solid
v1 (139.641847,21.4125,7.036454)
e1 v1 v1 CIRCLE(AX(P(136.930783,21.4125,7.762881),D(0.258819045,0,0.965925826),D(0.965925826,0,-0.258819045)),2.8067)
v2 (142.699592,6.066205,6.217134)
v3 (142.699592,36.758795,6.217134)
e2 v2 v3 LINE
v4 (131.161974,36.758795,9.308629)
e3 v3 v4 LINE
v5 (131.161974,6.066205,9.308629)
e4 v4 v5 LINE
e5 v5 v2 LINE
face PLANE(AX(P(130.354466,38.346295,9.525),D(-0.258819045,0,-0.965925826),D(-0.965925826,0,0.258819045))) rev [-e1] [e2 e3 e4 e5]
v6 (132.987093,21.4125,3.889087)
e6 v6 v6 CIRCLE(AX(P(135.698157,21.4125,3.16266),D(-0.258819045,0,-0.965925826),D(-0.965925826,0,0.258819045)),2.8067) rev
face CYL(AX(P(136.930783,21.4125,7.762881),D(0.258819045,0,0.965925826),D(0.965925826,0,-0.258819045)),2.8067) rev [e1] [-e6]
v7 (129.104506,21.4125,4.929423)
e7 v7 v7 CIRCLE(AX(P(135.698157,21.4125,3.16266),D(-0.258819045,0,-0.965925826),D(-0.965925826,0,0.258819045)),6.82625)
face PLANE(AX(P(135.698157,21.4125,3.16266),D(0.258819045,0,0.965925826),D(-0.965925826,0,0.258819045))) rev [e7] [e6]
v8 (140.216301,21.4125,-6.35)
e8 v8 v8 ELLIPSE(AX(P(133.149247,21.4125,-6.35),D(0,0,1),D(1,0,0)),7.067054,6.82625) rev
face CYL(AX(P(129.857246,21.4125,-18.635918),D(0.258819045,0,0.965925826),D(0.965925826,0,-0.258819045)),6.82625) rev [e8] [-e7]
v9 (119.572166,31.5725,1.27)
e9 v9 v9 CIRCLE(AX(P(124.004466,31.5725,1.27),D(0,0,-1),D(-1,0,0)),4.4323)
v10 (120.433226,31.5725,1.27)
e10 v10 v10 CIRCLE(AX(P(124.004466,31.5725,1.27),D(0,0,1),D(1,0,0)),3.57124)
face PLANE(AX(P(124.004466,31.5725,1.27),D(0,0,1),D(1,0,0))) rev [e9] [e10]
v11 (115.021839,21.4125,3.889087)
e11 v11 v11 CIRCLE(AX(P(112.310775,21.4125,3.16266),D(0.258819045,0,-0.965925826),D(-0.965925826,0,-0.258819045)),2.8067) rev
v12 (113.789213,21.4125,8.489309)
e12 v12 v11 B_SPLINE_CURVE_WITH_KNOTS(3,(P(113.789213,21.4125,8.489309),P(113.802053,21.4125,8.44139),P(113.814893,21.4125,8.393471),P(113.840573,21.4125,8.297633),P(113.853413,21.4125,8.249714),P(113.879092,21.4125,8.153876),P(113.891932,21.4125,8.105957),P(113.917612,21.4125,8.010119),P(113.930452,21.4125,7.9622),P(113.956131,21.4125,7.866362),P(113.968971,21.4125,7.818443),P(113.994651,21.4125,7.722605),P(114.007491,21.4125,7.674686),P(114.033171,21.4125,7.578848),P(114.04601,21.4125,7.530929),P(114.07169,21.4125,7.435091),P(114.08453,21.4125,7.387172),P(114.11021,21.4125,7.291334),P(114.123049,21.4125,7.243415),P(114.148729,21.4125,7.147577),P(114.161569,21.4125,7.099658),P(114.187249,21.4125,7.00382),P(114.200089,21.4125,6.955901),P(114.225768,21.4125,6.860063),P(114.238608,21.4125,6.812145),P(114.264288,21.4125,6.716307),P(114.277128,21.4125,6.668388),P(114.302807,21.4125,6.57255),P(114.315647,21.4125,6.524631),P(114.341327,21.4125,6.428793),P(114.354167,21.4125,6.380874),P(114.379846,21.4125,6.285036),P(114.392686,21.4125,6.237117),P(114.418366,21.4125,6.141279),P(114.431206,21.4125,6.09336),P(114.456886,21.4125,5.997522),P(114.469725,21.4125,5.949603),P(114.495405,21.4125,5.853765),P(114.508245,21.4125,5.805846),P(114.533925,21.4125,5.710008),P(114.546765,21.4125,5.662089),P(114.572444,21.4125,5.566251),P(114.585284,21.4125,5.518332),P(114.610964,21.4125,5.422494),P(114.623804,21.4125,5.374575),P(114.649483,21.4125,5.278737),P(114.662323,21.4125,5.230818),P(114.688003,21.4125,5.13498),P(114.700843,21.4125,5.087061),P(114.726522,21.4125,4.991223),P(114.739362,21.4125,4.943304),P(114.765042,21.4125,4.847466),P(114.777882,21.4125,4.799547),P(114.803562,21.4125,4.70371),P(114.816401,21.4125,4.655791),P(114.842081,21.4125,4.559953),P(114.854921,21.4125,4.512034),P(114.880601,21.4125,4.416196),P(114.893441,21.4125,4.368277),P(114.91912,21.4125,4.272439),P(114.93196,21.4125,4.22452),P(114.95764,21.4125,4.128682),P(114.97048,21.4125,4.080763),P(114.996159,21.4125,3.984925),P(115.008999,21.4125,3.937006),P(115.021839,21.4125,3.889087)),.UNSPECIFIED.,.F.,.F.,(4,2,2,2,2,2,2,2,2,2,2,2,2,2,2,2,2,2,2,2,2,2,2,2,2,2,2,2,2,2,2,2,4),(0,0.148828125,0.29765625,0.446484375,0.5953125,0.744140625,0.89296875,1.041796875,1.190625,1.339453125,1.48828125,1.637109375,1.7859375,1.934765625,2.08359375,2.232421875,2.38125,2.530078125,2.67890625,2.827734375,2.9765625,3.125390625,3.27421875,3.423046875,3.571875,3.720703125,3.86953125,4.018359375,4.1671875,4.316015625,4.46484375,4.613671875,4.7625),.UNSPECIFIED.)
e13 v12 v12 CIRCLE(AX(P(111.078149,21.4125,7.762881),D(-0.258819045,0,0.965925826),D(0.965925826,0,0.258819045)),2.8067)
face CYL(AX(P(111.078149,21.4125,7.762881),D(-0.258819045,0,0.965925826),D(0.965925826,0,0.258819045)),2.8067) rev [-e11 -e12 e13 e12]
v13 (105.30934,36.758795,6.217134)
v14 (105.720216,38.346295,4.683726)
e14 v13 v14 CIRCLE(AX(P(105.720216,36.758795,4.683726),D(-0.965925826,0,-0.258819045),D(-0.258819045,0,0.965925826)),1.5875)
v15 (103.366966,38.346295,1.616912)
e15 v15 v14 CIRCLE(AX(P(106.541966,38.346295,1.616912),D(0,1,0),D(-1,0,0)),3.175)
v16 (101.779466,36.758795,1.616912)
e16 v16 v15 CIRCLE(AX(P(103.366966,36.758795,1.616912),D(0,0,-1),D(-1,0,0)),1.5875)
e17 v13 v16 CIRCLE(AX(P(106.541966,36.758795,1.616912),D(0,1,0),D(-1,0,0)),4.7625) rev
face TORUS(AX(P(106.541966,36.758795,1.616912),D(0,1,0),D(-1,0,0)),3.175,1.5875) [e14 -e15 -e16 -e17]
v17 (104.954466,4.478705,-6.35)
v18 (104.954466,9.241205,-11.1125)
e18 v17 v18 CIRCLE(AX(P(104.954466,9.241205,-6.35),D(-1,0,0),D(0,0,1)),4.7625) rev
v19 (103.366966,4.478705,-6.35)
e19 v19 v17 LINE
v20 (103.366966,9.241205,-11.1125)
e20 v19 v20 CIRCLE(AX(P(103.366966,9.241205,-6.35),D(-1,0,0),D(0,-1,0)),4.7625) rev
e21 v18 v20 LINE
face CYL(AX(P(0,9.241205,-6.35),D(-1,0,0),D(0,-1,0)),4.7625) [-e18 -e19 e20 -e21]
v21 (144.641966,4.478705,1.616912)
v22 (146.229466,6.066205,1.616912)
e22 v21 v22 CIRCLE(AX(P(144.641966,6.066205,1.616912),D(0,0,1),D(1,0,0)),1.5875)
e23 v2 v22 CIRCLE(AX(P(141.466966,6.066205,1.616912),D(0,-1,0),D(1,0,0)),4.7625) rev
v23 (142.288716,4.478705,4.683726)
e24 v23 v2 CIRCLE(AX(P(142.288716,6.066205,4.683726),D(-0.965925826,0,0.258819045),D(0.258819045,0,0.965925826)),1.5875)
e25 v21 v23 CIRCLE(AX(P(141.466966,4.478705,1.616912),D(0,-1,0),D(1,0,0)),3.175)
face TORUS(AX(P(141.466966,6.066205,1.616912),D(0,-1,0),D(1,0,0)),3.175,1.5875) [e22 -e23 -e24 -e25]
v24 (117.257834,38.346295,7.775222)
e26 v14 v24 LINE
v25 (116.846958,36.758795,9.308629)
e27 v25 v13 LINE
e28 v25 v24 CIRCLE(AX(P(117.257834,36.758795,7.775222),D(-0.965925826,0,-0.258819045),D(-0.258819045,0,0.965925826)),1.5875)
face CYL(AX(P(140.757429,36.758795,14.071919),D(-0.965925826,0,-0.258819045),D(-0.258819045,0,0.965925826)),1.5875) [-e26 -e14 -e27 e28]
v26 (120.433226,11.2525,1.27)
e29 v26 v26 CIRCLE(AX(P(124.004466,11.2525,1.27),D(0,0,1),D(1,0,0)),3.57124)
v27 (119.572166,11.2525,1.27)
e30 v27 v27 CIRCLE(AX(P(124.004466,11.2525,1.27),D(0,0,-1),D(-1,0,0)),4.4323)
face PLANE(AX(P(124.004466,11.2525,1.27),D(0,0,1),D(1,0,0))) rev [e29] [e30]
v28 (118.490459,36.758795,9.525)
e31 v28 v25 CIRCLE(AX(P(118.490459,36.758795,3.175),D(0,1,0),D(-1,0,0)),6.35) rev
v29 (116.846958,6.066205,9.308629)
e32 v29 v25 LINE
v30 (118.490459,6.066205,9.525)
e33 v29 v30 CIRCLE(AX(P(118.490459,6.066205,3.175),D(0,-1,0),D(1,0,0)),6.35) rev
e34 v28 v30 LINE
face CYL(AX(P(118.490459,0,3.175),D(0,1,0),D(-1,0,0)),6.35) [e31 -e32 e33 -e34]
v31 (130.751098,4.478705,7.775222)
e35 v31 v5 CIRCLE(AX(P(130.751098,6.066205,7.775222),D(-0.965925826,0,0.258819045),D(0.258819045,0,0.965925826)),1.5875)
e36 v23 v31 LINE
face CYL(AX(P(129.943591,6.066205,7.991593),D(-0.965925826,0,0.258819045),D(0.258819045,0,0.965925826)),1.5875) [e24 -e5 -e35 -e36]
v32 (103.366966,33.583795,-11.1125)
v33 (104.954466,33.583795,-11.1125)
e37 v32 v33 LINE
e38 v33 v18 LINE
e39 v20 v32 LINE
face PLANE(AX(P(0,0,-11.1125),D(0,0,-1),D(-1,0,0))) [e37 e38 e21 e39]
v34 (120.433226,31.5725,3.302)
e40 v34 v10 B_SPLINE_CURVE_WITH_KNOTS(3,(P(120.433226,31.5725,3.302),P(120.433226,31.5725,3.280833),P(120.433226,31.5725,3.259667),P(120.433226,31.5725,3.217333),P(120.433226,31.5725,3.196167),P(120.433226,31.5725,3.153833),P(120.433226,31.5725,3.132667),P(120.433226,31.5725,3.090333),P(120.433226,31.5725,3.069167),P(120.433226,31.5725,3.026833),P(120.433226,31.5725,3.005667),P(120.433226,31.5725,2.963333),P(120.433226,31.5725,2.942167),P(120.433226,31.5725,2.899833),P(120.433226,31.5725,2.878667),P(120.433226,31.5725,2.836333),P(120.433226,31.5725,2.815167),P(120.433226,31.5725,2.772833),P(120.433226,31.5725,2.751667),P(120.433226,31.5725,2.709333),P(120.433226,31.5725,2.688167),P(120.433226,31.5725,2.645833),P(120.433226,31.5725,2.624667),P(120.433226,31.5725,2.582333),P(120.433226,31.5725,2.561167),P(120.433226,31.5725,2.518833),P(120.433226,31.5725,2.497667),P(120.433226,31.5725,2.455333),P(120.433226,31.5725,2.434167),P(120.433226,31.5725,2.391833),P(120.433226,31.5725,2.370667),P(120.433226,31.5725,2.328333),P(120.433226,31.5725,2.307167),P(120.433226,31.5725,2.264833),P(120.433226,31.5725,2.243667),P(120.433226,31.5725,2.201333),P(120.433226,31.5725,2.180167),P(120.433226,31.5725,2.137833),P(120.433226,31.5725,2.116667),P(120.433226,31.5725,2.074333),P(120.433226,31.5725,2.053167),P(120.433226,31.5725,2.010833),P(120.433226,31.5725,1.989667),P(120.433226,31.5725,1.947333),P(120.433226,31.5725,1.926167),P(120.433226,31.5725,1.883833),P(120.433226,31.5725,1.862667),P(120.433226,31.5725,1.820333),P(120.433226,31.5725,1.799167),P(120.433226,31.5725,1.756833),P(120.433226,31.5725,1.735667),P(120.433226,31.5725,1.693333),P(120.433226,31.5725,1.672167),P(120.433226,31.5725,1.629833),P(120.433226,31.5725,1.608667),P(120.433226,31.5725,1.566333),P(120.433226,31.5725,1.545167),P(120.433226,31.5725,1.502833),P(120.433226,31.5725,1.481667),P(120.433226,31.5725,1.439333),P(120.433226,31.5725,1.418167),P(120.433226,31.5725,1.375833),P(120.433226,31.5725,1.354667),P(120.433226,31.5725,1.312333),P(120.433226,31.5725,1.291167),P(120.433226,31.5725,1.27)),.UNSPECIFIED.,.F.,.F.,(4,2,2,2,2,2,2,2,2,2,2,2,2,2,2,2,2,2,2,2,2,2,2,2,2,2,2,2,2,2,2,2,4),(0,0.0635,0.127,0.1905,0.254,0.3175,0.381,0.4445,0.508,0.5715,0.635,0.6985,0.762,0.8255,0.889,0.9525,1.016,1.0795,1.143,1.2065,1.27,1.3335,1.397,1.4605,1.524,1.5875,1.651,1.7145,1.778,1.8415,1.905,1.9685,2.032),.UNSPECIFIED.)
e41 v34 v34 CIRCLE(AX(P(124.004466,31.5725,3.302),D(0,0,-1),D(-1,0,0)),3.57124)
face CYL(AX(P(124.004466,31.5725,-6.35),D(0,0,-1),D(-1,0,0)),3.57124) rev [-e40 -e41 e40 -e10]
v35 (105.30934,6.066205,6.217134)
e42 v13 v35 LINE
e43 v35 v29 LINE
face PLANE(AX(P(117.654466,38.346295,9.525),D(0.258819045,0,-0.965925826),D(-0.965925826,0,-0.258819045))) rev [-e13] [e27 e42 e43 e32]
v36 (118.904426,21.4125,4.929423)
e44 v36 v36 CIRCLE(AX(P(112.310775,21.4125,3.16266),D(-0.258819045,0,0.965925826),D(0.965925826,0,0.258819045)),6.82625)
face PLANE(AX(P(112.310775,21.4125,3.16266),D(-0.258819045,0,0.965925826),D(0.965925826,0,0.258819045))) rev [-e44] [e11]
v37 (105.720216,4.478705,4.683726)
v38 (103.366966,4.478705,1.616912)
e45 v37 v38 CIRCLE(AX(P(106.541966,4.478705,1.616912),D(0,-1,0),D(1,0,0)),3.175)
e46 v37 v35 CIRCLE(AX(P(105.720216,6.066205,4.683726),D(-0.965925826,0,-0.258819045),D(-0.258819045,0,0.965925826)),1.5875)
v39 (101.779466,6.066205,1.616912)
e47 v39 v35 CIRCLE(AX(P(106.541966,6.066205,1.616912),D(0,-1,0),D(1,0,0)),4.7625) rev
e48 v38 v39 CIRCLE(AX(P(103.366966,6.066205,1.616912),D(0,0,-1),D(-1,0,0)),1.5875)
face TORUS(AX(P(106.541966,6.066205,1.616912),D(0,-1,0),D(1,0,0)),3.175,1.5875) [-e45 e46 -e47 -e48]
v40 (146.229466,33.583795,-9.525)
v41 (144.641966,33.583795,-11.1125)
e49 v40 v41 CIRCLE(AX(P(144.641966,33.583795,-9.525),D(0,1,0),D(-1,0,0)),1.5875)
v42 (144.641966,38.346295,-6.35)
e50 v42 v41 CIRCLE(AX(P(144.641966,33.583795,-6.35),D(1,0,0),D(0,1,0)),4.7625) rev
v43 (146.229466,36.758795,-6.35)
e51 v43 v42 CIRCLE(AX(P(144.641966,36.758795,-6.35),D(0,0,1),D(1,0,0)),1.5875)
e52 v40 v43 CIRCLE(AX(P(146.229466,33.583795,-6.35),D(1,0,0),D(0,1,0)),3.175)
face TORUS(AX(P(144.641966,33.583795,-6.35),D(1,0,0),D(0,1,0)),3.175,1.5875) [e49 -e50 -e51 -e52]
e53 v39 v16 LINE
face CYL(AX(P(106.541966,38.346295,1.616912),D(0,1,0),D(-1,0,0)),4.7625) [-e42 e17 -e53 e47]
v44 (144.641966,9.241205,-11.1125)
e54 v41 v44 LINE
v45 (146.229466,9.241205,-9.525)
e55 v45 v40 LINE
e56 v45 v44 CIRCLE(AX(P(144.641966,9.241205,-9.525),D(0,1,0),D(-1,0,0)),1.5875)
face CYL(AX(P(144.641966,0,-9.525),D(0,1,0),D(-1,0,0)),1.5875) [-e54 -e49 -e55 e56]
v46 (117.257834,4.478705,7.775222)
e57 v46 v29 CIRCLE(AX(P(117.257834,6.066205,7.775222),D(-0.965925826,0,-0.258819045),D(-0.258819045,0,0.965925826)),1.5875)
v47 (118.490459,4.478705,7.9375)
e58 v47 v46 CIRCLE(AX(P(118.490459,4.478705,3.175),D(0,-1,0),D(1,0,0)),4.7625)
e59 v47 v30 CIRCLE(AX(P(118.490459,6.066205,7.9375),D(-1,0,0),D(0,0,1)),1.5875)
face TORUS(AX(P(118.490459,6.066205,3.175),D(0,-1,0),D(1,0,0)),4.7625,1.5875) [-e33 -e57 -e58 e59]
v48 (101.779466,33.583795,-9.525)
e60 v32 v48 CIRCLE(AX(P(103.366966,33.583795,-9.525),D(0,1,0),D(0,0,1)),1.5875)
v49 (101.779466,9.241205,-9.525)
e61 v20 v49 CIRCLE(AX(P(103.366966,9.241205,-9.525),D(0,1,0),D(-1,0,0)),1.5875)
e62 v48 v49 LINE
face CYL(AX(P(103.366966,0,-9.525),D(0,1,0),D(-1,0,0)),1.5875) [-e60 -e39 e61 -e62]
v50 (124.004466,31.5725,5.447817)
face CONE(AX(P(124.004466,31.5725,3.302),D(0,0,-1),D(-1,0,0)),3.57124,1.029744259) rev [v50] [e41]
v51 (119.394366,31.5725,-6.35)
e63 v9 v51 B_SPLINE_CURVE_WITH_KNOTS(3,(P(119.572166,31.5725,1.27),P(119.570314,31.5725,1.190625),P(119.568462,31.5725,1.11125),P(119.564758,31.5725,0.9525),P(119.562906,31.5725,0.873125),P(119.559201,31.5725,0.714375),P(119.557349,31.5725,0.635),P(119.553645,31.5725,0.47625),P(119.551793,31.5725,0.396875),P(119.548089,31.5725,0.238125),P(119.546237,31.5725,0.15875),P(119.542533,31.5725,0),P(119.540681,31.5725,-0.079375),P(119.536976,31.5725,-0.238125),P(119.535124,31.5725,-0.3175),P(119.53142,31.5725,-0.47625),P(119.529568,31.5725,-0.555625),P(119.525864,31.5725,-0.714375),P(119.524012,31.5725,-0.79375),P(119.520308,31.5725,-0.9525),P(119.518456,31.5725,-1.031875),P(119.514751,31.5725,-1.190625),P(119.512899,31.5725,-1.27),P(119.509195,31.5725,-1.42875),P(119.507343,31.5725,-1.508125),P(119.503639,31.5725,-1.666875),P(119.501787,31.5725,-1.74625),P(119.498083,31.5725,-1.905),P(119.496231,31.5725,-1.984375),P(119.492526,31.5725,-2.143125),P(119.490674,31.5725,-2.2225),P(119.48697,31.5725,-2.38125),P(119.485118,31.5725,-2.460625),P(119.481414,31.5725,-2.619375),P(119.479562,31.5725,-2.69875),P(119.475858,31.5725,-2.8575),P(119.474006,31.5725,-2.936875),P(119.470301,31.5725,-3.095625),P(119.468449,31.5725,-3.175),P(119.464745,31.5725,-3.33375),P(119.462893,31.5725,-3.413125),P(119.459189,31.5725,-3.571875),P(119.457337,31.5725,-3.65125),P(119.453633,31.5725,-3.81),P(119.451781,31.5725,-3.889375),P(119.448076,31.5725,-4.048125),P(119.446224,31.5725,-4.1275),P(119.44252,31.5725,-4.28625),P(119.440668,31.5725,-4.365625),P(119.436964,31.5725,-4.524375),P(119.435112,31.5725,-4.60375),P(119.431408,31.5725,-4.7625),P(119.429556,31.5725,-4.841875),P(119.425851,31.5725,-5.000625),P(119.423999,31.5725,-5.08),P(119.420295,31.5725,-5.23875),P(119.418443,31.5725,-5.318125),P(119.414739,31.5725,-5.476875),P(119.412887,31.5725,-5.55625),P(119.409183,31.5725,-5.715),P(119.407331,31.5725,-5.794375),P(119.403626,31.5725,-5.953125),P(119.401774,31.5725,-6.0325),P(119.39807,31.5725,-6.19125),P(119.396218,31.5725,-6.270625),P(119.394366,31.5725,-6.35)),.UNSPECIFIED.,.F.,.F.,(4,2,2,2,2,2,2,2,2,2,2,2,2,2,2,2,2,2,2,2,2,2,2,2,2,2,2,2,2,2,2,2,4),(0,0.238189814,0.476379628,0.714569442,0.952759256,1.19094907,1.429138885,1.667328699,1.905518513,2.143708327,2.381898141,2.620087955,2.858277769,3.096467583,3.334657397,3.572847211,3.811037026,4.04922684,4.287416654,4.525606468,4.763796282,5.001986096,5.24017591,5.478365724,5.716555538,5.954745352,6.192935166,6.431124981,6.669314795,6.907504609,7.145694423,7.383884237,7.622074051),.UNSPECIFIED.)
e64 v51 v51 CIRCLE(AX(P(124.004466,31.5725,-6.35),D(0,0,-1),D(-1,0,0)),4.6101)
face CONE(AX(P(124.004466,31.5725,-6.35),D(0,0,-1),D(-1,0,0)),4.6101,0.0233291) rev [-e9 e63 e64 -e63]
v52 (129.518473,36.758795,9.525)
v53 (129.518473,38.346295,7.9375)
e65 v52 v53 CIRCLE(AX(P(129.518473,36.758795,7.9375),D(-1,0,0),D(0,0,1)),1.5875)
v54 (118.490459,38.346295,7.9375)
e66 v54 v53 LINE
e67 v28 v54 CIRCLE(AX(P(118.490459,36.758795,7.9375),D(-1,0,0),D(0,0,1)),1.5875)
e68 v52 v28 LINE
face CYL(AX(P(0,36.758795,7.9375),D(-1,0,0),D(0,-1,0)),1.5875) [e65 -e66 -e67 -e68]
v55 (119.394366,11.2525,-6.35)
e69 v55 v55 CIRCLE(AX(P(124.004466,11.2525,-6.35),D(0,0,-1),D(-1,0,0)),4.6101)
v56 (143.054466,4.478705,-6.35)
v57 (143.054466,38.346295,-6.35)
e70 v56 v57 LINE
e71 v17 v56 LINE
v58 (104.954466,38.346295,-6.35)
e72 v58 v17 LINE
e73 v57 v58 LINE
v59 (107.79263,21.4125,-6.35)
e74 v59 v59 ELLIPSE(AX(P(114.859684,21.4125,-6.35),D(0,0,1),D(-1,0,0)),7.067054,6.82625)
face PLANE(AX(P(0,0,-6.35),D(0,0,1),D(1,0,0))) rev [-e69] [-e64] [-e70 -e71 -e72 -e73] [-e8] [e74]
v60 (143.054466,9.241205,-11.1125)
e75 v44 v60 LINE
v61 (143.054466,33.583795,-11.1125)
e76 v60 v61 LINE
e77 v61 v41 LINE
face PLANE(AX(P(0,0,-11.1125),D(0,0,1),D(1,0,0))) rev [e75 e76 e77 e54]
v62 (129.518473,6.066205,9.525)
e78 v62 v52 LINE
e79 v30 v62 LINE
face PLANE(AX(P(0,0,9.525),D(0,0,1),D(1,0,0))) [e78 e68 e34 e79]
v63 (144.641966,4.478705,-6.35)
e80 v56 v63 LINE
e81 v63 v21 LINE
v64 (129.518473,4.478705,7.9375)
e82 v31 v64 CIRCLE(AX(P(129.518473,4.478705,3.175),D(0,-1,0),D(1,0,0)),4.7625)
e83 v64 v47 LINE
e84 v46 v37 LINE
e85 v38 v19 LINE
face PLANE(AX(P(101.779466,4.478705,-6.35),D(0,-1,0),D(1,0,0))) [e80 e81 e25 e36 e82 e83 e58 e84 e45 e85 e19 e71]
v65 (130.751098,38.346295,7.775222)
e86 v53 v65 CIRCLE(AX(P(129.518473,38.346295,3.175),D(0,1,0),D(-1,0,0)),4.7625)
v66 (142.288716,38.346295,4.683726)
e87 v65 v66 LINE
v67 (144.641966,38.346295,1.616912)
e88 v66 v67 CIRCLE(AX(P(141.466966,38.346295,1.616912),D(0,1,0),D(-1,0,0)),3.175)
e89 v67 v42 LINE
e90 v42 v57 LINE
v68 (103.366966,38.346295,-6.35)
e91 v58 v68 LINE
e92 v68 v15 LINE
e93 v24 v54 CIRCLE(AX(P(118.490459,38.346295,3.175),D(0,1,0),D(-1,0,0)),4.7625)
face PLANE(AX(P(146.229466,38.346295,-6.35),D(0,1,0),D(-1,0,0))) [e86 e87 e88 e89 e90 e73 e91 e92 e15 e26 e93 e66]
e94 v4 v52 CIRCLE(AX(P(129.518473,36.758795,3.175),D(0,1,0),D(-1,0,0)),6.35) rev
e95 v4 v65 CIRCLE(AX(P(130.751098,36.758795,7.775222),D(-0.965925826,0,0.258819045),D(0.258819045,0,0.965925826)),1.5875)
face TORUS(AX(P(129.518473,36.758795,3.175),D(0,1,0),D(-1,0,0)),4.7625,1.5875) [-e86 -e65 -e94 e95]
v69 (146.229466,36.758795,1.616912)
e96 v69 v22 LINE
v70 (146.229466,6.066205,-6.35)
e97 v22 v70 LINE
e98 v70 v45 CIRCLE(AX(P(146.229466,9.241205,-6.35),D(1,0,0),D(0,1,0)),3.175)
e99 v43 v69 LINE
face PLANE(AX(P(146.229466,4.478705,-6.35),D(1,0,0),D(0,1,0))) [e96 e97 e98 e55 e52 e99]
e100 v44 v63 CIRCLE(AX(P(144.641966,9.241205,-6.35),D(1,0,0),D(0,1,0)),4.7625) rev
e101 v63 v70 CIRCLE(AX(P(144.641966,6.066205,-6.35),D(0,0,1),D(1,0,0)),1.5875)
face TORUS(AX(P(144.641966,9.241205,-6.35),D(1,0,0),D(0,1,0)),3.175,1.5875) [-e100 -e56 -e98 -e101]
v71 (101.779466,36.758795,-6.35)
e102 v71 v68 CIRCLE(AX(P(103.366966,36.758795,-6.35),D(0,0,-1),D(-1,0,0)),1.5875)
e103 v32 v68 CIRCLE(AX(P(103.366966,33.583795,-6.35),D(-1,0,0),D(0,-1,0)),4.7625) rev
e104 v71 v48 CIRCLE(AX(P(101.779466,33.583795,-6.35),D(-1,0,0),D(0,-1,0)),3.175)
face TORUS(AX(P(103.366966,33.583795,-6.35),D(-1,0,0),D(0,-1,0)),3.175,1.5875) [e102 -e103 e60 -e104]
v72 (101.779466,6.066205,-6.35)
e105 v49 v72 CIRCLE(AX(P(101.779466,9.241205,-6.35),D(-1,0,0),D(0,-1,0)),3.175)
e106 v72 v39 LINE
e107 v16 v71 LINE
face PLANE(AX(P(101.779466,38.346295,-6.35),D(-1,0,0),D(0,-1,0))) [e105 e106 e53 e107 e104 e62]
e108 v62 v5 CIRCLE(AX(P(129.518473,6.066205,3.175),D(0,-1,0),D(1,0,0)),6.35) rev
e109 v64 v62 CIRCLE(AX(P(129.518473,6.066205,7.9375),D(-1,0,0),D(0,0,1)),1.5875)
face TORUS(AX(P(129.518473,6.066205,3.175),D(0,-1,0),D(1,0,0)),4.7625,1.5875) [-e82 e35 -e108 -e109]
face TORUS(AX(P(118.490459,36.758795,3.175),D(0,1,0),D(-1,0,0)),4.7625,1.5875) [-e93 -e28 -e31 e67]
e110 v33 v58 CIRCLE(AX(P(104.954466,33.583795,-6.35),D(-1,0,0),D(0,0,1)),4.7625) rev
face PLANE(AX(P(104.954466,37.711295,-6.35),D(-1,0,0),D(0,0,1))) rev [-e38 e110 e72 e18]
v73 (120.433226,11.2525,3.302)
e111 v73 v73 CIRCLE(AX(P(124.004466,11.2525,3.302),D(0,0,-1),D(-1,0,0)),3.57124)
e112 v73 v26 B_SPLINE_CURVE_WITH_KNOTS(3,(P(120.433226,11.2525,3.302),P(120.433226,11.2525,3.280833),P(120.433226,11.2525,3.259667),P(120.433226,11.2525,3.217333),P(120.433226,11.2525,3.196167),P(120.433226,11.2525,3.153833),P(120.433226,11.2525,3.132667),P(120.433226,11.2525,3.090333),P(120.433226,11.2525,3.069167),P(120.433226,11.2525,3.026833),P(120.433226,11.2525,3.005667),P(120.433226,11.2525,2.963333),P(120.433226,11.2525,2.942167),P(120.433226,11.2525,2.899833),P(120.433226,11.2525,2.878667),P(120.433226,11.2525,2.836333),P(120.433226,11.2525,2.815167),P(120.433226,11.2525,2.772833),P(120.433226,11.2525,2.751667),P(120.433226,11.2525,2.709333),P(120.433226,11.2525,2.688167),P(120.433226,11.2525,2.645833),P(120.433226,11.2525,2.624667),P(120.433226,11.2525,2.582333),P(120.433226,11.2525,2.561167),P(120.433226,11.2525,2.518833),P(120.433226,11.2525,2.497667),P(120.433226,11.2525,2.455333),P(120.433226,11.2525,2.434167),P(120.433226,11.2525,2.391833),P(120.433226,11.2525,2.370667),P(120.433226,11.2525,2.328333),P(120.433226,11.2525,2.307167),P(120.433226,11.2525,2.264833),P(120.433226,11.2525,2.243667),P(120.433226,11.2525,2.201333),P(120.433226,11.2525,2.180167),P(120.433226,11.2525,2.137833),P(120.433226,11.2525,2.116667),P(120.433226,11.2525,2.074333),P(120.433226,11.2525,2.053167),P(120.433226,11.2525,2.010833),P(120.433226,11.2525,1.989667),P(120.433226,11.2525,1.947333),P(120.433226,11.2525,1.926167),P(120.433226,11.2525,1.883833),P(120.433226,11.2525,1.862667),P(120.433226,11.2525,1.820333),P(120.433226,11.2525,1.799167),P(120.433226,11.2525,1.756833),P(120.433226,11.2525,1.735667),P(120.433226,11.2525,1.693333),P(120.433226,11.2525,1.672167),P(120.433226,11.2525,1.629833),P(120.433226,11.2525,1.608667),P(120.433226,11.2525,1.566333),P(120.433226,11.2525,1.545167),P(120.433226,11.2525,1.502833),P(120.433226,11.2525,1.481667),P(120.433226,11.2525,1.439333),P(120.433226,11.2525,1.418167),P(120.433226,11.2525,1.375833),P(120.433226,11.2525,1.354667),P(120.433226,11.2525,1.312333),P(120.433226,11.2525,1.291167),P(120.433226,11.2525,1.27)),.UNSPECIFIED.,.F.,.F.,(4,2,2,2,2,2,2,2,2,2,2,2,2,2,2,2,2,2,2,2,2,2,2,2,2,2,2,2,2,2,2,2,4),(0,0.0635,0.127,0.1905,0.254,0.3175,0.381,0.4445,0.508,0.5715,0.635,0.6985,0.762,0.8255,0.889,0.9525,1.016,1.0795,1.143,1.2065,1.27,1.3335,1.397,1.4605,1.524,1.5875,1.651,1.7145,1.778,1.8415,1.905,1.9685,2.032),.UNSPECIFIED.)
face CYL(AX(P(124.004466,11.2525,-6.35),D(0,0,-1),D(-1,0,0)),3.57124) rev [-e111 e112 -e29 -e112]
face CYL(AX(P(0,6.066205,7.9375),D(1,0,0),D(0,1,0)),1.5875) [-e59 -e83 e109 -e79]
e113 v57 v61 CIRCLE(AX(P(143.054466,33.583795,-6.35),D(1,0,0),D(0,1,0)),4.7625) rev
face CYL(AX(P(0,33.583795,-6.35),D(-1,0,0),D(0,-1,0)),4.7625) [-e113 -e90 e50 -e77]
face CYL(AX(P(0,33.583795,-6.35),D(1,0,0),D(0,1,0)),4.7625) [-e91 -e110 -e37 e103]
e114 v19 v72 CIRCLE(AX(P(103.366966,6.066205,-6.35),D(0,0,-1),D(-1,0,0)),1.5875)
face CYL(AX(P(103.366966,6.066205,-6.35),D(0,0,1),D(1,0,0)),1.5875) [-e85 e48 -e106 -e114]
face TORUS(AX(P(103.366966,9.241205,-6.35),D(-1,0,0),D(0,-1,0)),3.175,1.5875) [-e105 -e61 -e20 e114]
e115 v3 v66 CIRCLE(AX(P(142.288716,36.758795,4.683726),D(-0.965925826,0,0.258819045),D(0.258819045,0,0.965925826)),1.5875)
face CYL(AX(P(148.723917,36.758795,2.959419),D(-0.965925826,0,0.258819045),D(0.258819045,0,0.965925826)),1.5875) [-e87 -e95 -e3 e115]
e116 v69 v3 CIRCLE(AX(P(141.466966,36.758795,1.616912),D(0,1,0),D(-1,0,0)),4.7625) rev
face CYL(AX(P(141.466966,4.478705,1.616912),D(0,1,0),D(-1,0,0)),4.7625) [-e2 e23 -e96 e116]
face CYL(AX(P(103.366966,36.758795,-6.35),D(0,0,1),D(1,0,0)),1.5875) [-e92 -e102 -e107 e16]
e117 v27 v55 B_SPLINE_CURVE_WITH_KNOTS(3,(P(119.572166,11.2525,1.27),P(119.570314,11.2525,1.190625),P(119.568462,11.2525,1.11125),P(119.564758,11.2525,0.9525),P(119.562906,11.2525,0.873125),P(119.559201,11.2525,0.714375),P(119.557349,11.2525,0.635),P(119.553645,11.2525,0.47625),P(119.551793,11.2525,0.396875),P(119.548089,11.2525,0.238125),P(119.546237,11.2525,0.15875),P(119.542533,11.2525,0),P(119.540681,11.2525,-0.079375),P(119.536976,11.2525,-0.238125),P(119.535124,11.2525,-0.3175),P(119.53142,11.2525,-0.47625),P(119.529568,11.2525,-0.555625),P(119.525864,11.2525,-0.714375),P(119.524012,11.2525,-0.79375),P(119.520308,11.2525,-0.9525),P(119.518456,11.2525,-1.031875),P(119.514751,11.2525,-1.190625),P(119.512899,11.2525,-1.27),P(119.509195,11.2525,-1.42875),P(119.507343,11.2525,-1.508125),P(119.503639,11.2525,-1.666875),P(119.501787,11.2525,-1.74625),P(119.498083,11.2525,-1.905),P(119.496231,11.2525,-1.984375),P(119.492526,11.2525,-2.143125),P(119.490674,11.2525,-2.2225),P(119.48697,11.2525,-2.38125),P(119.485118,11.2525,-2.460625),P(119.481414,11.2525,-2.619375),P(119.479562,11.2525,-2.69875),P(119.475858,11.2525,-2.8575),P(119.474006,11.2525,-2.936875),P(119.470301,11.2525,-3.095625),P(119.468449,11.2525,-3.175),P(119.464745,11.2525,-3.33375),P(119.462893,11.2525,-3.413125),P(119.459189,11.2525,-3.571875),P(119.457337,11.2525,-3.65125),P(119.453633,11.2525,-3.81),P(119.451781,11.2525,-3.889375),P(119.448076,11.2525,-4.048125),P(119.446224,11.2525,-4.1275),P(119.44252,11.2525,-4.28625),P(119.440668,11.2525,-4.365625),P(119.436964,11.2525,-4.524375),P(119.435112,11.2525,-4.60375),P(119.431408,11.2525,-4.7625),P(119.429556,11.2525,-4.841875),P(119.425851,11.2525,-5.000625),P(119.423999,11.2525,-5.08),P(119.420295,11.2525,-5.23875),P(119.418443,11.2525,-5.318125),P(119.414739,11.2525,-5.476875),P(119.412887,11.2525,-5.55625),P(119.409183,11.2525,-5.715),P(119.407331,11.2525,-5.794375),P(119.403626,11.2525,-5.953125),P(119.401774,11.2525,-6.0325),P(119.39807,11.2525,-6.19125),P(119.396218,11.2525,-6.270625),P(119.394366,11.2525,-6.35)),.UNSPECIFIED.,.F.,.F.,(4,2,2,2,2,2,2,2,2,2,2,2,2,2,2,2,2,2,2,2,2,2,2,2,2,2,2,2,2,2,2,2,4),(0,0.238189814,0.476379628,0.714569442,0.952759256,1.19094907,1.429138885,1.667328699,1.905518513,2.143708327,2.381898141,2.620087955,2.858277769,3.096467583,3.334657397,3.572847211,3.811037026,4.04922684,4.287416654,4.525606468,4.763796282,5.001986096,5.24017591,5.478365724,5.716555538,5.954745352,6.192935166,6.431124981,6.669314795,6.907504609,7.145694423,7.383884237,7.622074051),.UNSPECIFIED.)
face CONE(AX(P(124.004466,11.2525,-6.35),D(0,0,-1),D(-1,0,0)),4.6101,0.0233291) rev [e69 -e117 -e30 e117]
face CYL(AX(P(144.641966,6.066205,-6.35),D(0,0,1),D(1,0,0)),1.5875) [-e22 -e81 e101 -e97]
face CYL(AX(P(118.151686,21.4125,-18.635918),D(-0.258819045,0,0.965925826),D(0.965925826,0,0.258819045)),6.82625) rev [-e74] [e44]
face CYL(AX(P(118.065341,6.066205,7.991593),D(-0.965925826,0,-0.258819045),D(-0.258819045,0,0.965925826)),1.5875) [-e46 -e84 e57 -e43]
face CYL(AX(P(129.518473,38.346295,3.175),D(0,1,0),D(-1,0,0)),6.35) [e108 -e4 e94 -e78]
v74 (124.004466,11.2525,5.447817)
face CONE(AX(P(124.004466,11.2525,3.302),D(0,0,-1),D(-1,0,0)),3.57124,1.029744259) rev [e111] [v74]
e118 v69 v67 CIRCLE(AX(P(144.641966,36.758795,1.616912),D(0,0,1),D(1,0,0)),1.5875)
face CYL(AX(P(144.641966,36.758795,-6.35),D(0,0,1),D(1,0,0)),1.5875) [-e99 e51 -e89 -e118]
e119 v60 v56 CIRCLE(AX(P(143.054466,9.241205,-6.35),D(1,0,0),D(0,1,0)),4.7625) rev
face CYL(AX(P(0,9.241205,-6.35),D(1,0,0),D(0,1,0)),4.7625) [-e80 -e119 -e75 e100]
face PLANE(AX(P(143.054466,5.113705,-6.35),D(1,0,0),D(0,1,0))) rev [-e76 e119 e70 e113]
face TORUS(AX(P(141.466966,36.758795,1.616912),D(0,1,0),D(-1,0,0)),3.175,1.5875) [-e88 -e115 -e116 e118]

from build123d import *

# Parameters (mm, degrees)
SKETCH1_W                   = 44.45
SKETCH1_H                   = 33.86758938
SKETCH1_W_2                 = 38.1
SKETCH1_H_2                 = 32.59758938
BOSS_EXTRUDE1_DEPTH         = 6.35
SKETCH2_W                   = 44.45
SKETCH2_H                   = 33.86758938
BOSS_EXTRUDE2_DEPTH         = 9.525
CUT_EXTRUDE1_DEPTH          = 151.402114191
SKETCH4_W                   = 3.175
SKETCH4_H                   = 33.86758938
BOSS_EXTRUDE3_DEPTH         = 4.7625
SHELL2_START                = 9.24120531
SHELL2_DEPTH                = 24.34258938
FILLET4_R                   = 4.7625
FILLET1_R                   = 4.7625
FILLET3_R                   = 6.35
FILLET2_R                   = 1.5875
F_10_CLEARANCE_HOLE1_D      = 5.6134
F_10_CLEARANCE_HOLE1_DEPTH  = 7.802129636
BOSS_EXTRUDE4_REACH         = 152.369
CUT_EXTRUDE2_START          = -4.7625
SKETCH9_R                   = 6.82625
CUT_EXTRUDE2_DEPTH          = 145.161286958
HOLE1_AT_2_COUNT            = 2
HOLE1_AT_2_PITCH            = 20.32
F_1_4_CLEARANCE_HOLE1_D     = 7.14248
F_1_4_CLEARANCE_HOLE1_DEPTH = 9.652
F_1_4_CLEARANCE_HOLE1_TIP   = 2.145817477


# Read off the part's stored shape, not the designer's step: Shell2
with BuildPart() as part:
    # Sketch1 → Boss-Extrude1 (new body)
    with BuildSketch(Plane.XY):
        with Locations((124.004465969, 21.4125)):
            Rectangle(SKETCH1_W, SKETCH1_H)
        with Locations((124.004465969, 21.4125)):
            Rectangle(SKETCH1_W_2, SKETCH1_H_2, mode=Mode.SUBTRACT)
    extrude(amount=-BOSS_EXTRUDE1_DEPTH)

    # Sketch2 → Boss-Extrude2 (add)
    with BuildSketch(Plane.XY):
        with Locations((124.004465969, 21.4125)):
            Rectangle(SKETCH2_W, SKETCH2_H)
    extrude(amount=BOSS_EXTRUDE2_DEPTH)

    # Sketch3 → Cut-Extrude1 (cut, through all)
    with BuildSketch(Plane.XZ.offset(-4.47870531)):
        Polygon((130.354465969, 9.525), (146.229465969, 5.27130657), (146.229465969, 9.525), align=None)
        Polygon((101.779465969, 9.525), (117.654465969, 9.525), (101.779465969, 5.27130657), align=None)
    extrude(amount=-CUT_EXTRUDE1_DEPTH, mode=Mode.SUBTRACT)

    # Sketch4 → Boss-Extrude3 (add)
    with BuildSketch(Plane(origin=(0, 0, -6.35), x_dir=(-1, 0, 0), z_dir=(0, 0, -1))):
        with Locations((-144.641965969, 21.4125)):
            Rectangle(SKETCH4_W, SKETCH4_H)
        with Locations((-103.366965969, 21.4125)):
            Rectangle(SKETCH4_W, SKETCH4_H)
    extrude(amount=BOSS_EXTRUDE3_DEPTH)

    # Shell2 outline → Shell2 (cut)
    with BuildSketch(Plane(origin=(0, 0, 0), x_dir=(1, 0, 0), z_dir=(0, 1, 0)).offset(SHELL2_START)):
        Polygon((141.466965969, 0), (106.541965969, 0), (106.541965969, -1.61691179), (118.281460989, -4.7625), (129.727470949, -4.7625), (141.466965969, -1.61691179), align=None)
    extrude(amount=SHELL2_DEPTH, mode=Mode.SUBTRACT)

    # Fillet4
    fillet4_edges = [part.edges().sort_by_distance(p)[0] for p in [
        (144.641965969, 38.34629469, -11.1125),
        (103.366965969, 38.34629469, -11.1125),
        (144.641965969, 4.47870531, -11.1125),
        (103.366965969, 4.47870531, -11.1125),
    ]]
    fillet(fillet4_edges, radius=FILLET4_R)

    # Fillet1
    fillet1_edges = [part.edges().sort_by_distance(p)[0] for p in [
        (146.229465969, 21.4125, 5.27130657),
        (101.779465969, 21.4125, 5.27130657),
    ]]
    fillet(fillet1_edges, radius=FILLET1_R)

    # Fillet3
    fillet3_edges = [part.edges().sort_by_distance(p)[0] for p in [
        (130.354465969, 21.4125, 9.525),
        (117.654465969, 21.4125, 9.525),
    ]]
    fillet(fillet3_edges, radius=FILLET3_R)

    # Fillet2
    fillet2_edges = [part.edges().sort_by_distance(p)[0] for p in [
        (146.229465969, 21.4125, -11.1125),
        (146.229465969, 4.47870531, -2.366544105),
        (146.229465969, 38.34629469, -2.366544105),
        (146.229465969, 5.873609265, -9.717596045),
        (146.229465969, 36.951390735, -9.717596045),
        (101.779465969, 38.34629469, -2.366544105),
        (101.779465969, 21.4125, -11.1125),
        (101.779465969, 4.47870531, -2.366544105),
        (101.779465969, 5.873609265, -9.717596045),
        (101.779465969, 36.951390735, -9.717596045),
        (111.07814933, 4.47870531, 7.762881267),
        (102.763620686, 4.47870531, 4.516138096),
        (145.245311252, 4.47870531, 4.516138096),
        (111.07814933, 38.34629469, 7.762881267),
        (102.763620686, 38.34629469, 4.516138096),
        (145.245311252, 38.34629469, 4.516138096),
        (124.004465969, 38.34629469, 9.525),
        (124.004465969, 4.47870531, 9.525),
        (136.930782609, 4.47870531, 7.762881267),
        (130.34731393, 4.47870531, 9.47067487),
        (117.661618008, 4.47870531, 9.47067487),
        (136.930782609, 38.34629469, 7.762881267),
        (130.34731393, 38.34629469, 9.47067487),
        (117.661618008, 38.34629469, 9.47067487),
    ]]
    fillet(fillet2_edges, radius=FILLET2_R)

    # #10 Clearance Hole1
    with Locations(Plane(origin=(5.500104786, 0, -20.526670507), x_dir=(0.96592582628907, 0, 0.2588190451025144), z_dir=(-0.2588190451025144, 0, 0.96592582628907))):
        with Locations((109.302434691, 21.4125)):
            f_10_clearance_hole1 = Hole(F_10_CLEARANCE_HOLE1_D / 2, depth=F_10_CLEARANCE_HOLE1_DEPTH)

    # Mirror1: #10 Clearance Hole1 across plane
    add(f_10_clearance_hole1.mirror(Plane(origin=(124.004465969, 0, 0), x_dir=(0, 0, 1), z_dir=(1, 0, 0))), mode=Mode.SUBTRACT)

    # Sketch8 → Boss-Extrude4 (add, up to next)
    with BuildSketch(Plane(origin=(0, 5.11370531, 0), x_dir=(1, 0, 0), z_dir=(0, 1, 0)), mode=Mode.PRIVATE) as boss_extrude4_sk1:
        Polygon((106.541965969, 0), (106.541965969, -1.61691179), (118.281460989, -4.7625), (129.727470949, -4.7625), (141.466965969, -1.61691179), (141.466965969, 0), (143.054465969, 0), (143.054465969, 6.35), (104.954465969, 6.35), (104.954465969, 0), align=None)
    boss_extrude4_tool1 = extrude(boss_extrude4_sk1.sketch, amount=BOSS_EXTRUDE4_REACH, mode=Mode.PRIVATE) - part.part
    add(boss_extrude4_tool1.solids().sort_by_distance((124.004466, 5.113705, -1.371306))[0])

    # Sketch9 → Cut-Extrude2 (cut, through all)
    with BuildSketch(Plane(origin=(5.500104786, 0, -20.526670507), x_dir=(0.96592582628907, 0, 0.2588190451025144), z_dir=(-0.2588190451025144, 0, 0.96592582628907)).offset(CUT_EXTRUDE2_START)):
        with Locations((109.302434691, 21.4125)):
            Circle(SKETCH9_R)
    cut_extrude2 = extrude(amount=-CUT_EXTRUDE2_DEPTH, mode=Mode.SUBTRACT)

    # Mirror2: Cut-Extrude2 across plane
    add(cut_extrude2.mirror(Plane(origin=(124.004465969, 0, 0), x_dir=(0, 0, 1), z_dir=(1, 0, 0))), mode=Mode.SUBTRACT)

    # Sketch12 → Hole1 (revolve, cut)
    with BuildSketch(Plane(origin=(124.004465969, 31.5725, -6.35), x_dir=(0, 1, 0), z_dir=(1, 0, 0))):
        Polygon((0, 0), (0, 7.62), (4.4323, 7.62), (4.6101, 0), align=None)
    hole1 = revolve(axis=Axis((124.004465969, 31.5725, 103.65), (0, 0, -1)), mode=Mode.SUBTRACT)

    # Hole1 at 2: Hole1 ×2
    with Locations(*[(0, -i * HOLE1_AT_2_PITCH, 0) for i in range(1, HOLE1_AT_2_COUNT)]):
        add(hole1, mode=Mode.SUBTRACT)

    # 1/4 Clearance Hole1
    with Locations(Plane(origin=(0, 0, -6.35), x_dir=(-1, 0, 0), z_dir=(0, 0, -1))):
        with Locations((-124.004465969, 11.2525), (-124.004465969, 31.5725)):
            Hole(F_1_4_CLEARANCE_HOLE1_D / 2, depth=F_1_4_CLEARANCE_HOLE1_DEPTH)
            with Locations((0, 0, -(F_1_4_CLEARANCE_HOLE1_DEPTH + F_1_4_CLEARANCE_HOLE1_TIP / 2))):  # 118° drill point
                Cone(0, F_1_4_CLEARANCE_HOLE1_D / 2, F_1_4_CLEARANCE_HOLE1_TIP, mode=Mode.SUBTRACT)


solid = part.part
